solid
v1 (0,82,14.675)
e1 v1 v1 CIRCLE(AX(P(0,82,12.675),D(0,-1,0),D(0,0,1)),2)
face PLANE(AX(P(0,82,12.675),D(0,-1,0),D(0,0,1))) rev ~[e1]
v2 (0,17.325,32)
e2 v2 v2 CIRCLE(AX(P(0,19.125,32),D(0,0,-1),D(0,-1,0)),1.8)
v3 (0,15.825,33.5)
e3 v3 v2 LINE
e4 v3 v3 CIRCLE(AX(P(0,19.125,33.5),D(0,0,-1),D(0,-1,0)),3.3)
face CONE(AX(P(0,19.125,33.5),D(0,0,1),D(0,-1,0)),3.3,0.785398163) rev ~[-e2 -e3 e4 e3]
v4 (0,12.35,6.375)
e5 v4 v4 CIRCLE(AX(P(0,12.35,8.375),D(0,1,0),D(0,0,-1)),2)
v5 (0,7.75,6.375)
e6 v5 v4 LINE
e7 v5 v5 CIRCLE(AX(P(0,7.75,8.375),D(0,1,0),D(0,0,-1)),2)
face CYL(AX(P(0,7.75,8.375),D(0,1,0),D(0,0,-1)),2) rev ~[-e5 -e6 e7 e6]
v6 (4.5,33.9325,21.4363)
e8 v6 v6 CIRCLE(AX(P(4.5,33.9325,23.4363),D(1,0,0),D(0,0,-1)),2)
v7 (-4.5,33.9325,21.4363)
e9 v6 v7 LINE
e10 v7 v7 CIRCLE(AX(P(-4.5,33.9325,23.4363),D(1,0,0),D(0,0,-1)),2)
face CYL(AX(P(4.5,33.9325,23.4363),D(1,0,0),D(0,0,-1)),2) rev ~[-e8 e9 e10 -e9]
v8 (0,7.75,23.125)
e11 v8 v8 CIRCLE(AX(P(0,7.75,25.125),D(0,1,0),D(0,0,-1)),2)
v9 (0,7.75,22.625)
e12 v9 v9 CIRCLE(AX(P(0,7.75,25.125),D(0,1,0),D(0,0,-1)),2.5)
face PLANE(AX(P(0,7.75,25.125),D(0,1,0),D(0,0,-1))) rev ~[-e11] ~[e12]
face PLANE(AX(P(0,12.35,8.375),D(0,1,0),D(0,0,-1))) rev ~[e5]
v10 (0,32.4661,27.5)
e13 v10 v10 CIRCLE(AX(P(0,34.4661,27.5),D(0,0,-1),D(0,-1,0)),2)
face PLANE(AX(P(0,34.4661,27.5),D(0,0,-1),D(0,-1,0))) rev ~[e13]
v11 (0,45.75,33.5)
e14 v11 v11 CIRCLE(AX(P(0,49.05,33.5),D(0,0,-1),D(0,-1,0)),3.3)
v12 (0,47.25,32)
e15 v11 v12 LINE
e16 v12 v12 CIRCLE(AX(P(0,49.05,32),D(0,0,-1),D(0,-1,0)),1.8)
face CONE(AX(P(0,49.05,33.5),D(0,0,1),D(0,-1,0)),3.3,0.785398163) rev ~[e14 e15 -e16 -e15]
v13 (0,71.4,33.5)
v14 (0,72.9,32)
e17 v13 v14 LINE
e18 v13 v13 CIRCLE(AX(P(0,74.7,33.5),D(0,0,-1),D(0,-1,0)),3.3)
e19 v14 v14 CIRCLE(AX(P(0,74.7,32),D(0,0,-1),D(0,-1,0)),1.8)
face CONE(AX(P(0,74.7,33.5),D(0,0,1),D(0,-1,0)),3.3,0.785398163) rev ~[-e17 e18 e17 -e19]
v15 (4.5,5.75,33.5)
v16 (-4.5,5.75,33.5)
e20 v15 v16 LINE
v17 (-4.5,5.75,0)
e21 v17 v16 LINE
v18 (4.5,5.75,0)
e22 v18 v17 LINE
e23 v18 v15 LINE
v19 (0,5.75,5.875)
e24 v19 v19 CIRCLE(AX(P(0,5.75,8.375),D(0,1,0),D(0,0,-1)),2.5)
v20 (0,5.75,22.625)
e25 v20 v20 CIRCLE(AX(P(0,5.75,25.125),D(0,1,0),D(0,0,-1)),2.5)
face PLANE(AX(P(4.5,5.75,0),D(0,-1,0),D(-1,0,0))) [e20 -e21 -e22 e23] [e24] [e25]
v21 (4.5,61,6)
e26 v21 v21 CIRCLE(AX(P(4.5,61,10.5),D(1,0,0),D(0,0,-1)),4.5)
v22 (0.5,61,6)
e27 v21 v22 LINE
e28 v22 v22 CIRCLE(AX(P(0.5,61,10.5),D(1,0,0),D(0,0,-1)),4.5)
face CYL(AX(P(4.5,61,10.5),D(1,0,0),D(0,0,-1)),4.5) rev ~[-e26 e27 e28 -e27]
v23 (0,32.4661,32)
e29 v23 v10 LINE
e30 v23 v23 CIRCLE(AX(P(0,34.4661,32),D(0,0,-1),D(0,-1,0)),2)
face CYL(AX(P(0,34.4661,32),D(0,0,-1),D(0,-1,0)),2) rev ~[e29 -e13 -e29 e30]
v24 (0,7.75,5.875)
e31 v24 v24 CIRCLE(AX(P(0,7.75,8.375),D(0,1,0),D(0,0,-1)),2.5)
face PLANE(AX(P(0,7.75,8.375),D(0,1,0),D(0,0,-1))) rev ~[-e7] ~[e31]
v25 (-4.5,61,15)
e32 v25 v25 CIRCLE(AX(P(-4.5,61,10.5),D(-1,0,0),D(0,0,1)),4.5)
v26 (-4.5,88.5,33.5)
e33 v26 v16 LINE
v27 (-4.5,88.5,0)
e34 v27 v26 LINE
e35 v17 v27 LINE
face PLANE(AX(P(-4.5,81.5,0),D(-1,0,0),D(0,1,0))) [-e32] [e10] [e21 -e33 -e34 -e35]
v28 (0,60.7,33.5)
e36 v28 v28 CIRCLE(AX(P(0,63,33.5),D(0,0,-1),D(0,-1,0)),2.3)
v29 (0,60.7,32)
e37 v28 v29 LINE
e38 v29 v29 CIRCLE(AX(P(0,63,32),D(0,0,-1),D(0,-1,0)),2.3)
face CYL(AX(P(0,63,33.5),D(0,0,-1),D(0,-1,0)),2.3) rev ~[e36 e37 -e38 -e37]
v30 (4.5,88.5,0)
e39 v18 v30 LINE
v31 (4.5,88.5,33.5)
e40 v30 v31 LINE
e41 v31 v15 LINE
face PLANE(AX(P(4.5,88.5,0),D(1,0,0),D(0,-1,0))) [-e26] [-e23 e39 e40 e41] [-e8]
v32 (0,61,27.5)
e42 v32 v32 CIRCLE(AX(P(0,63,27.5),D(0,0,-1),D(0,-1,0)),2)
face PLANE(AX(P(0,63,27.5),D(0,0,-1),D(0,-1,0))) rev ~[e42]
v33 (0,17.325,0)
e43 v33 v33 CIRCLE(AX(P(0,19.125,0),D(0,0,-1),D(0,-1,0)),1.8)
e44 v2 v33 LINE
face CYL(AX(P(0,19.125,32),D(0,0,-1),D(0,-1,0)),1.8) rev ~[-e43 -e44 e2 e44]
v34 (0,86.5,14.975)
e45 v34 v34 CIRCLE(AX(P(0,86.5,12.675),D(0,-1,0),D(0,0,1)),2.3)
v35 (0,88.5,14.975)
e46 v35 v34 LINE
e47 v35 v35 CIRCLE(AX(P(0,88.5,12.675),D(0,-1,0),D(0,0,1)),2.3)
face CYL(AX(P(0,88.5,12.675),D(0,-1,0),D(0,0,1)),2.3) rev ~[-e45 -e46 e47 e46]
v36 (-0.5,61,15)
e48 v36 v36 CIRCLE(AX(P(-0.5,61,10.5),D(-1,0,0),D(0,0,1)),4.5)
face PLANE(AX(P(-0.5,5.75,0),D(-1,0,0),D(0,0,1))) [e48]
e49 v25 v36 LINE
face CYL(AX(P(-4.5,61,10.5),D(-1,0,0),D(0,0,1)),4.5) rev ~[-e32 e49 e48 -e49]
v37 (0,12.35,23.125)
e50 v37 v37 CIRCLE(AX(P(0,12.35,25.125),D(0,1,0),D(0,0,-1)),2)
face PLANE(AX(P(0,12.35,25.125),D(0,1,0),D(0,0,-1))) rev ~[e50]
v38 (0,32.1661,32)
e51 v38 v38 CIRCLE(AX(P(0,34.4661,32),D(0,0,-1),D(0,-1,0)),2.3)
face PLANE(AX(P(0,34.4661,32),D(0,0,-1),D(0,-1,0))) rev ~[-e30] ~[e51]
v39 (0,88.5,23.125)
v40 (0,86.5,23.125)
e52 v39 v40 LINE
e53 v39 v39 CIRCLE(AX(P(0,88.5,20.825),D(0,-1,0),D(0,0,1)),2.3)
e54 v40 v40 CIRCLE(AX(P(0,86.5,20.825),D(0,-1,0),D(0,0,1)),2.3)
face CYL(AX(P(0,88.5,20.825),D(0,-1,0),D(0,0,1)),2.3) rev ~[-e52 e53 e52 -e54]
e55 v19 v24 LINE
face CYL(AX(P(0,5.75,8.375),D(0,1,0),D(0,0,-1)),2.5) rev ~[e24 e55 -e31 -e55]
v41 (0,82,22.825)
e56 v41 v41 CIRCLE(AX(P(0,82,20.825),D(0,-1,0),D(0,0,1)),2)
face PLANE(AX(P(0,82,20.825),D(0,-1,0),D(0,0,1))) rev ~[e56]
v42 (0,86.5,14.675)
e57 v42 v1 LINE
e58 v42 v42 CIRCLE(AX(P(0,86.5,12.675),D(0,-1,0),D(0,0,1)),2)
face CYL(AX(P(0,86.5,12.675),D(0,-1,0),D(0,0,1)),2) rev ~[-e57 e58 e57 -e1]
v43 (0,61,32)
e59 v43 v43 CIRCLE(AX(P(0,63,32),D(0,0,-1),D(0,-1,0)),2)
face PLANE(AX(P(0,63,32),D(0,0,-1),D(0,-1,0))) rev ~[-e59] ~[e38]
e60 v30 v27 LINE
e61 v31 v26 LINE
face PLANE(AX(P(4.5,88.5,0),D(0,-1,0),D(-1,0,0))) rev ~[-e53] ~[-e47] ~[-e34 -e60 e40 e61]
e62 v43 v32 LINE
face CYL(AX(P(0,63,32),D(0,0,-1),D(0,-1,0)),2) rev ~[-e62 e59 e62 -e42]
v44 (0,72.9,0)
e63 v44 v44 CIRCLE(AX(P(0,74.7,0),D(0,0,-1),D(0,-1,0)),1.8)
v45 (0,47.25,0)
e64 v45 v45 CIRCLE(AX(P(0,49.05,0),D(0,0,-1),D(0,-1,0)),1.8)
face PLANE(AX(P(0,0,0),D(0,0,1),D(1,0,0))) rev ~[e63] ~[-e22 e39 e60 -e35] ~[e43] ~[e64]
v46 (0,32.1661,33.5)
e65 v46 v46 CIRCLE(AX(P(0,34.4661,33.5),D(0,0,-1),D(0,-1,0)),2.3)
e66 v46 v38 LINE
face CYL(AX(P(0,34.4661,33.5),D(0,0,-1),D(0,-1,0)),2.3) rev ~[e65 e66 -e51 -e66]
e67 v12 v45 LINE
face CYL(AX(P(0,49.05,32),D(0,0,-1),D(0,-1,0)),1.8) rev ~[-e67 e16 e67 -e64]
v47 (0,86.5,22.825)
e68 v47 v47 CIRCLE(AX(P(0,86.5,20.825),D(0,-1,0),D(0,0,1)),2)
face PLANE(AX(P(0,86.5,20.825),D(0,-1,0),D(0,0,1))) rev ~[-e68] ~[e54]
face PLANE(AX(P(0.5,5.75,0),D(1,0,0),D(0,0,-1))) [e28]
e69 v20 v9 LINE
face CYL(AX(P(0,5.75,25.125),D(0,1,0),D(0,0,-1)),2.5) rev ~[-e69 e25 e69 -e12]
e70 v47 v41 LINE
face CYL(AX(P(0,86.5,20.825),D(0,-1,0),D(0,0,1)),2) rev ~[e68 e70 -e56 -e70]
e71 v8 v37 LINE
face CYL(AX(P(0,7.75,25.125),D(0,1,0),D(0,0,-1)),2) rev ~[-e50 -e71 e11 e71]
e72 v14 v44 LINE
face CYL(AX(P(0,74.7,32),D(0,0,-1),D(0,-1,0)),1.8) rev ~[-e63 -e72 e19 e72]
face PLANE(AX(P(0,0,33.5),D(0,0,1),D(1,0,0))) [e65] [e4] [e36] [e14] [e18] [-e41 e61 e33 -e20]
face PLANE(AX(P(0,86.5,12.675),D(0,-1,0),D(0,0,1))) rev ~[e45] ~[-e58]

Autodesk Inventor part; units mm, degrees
ref_plane "YZ Plane" through (0, 0, 0) normal (1, 0, 0) x (0, 1, 0)
ref_plane "XZ Plane" through (0, 0, 0) normal (0, 1, 0) x (-1, 0, 0)
ref_plane "Work Plane1" through (0, 0, 0) normal (0, 0, 1) x (1, 0, 0)
ref_plane "Work Plane2" through (-89, -40.3889, 33.5) normal (0, 0, 1) x (1, 0, 0)
sketch "Sketch1" plane through (0, 0, 0) normal (0, 0, 1) x (1, 0, 0)
  line L0 (23.5, 88.5) -> (-23.5, 88.5) projected
  line L1 (-23.5, 88.5) -> (-23.5, 36.5) projected
  line L2 (-26.5, 33.5) -> (-89, 33.5) projected
  line L3 (-89, 33.5) -> (-89, -72.5) projected
  line L4 (-89, -72.5) -> (-77, -72.5) projected
  line L5 (-74, -75.5) -> (-74, -93.5) projected
  line L6 (-74, -93.5) -> (74, -93.5) projected
  line L7 (74, -93.5) -> (74, -75.5) projected
  line L8 (77, -72.5) -> (89, -72.5) projected
  line L9 (89, -72.5) -> (89, 33.5) projected
  line L10 (89, 33.5) -> (26.5, 33.5) projected
  line L11 (23.5, 36.5) -> (23.5, 88.5) projected
  line L12 (-4.5, 81.5) -> (-4.5, 36.5) projected
  line L13 (-7.5, 33.5) -> (-13.5, 33.5) projected
  line L14 (-16.5, 36.5) -> (-16.5, 81.5) projected
  line L15 (7.5, 84.5) -> (13.5, 84.5) projected
  line L16 (16.5, 81.5) -> (16.5, 36.5) projected
  line L17 (13.5, 33.5) -> (7.5, 33.5) projected
  line L18 (4.5, 36.5) -> (4.5, 81.5) projected
  line L19 (-13.5, 84.5) -> (-7.5, 84.5) projected
  line L20 (-4.5, 88.5) -> (4.5, 88.5)
  line L21 (4.5, 88.5) -> (4.5, 5.75)
  line L22 (4.5, 5.75) -> (-4.5, 5.75)
  line L23 (-4.5, 5.75) -> (-4.5, 88.5)
  line L24 (-32.2, 4.75) -> (-59.9, 4.75)
  arc A0 (13.5, 33.5) -> (16.5, 36.5) centre (13.5, 36.5) ccw projected
  arc A1 (4.5, 36.5) -> (7.5, 33.5) centre (7.5, 36.5) ccw projected
  arc A2 (7.5, 84.5) -> (4.5, 81.5) centre (7.5, 81.5) ccw projected
  arc A3 (16.5, 81.5) -> (13.5, 84.5) centre (13.5, 81.5) ccw projected
  arc A4 (-4.5, 81.5) -> (-7.5, 84.5) centre (-7.5, 81.5) ccw projected
  arc A5 (-7.5, 33.5) -> (-4.5, 36.5) centre (-7.5, 36.5) ccw projected
  arc A6 (-16.5, 36.5) -> (-13.5, 33.5) centre (-13.5, 36.5) ccw projected
  arc A7 (-13.5, 84.5) -> (-16.5, 81.5) centre (-13.5, 81.5) ccw projected
  arc A8 (-26.5, 33.5) -> (-23.5, 36.5) centre (-26.5, 36.5) ccw projected
  arc A9 (-74, -75.5) -> (-77, -72.5) centre (-77, -75.5) ccw projected
  arc A10 (77, -72.5) -> (74, -75.5) centre (77, -75.5) ccw projected
  arc A11 (23.5, 36.5) -> (26.5, 33.5) centre (26.5, 36.5) ccw projected
  circle A12 centre (21.5, -85.5) radius 1.8 projected
  circle A13 centre (-64.5, -85.5) radius 1.8 projected
  circle A14 centre (83.4, -16.3889) radius 1.8 projected
  circle A15 centre (-83.4, -19.2889) radius 1.8 projected
  circle A16 centre (-21.5, -85.5) radius 1.8 projected
  circle A17 centre (64.5, -85.5) radius 1.8 projected
  circle A18 centre (39.125, 25.9125) radius 1.0065 projected
  circle A19 centre (72.95, 12.275) radius 1.0065 projected
  circle A20 centre (86, 30.5) radius 1.0065 projected
  circle A21 centre (-86, 30.5) radius 1.0065 projected
  circle A22 centre (-39.125, 12.3375) radius 1.0065 projected
  circle A23 centre (-72.95, 25.975) radius 1.0065 projected
  circle A24 centre (-72.95, 12.275) radius 1.0065 projected
  circle A25 centre (-39.125, 25.9125) radius 1.0065 projected
  circle A26 centre (-86, 7.75) radius 1.0065 projected
  circle A27 centre (86, 7.75) radius 1.0065 projected
  circle A28 centre (72.95, 25.975) radius 1.0065 projected
  circle A29 centre (39.125, 12.3375) radius 1.0065 projected
  circle A30 centre (78, -67.1725) radius 1.2295 projected
  circle A31 centre (-24.1, -73.1) radius 1.2295 projected
  circle A32 centre (-42.4984, -44.6666) radius 1.2295 projected
  circle A33 centre (-79, -42.3889) radius 1.2295 projected
  circle A34 centre (-19.5, 28.875) radius 1.2295 projected
  circle A35 centre (19.5, 9.55) radius 1.2295 projected
  circle A36 centre (19.5, 47.3) radius 1.2295 projected
  circle A37 centre (-19.5, 47.3) radius 1.2295 projected
  circle A38 centre (0, 74.7) radius 1.2295 projected
  circle A39 centre (-19.4231, 74.8077) radius 1.2295 projected
  circle A40 centre (19.5, 74.7) radius 1.2295 projected
  circle A41 centre (0, 49.05) radius 1.2295 projected
  circle A42 centre (19.5, 28.875) radius 1.2295 projected
  circle A43 centre (0, 19.125) radius 1.2295 projected
  circle A44 centre (-19.5, 9.55) radius 1.2295 projected
  circle A45 centre (-78, -67.1725) radius 1.2295 projected
  circle A46 centre (24.1, -73.1) radius 1.2295 projected
  circle A47 centre (42.5, -44.6649) radius 1.2295 projected
  circle A48 centre (79, -42.3889) radius 1.2295 projected
  circle A49 centre (24.1, -24.9) radius 1.2295 projected
  circle A50 centre (-24.1, -24.9) radius 1.2295 projected
  point P0 (0, 0)
  point P1 (-4.5, 81.5)
  point P2 (-4.5, 36.5)
  point P3 (7.5, 81.5)
  point P4 (13.5, 81.5)
  point P5 (-7.5, 81.5)
  point P6 (-13.5, 81.5)
  dimension "d41" = 1
extrude "Extrusion1" add sketch "Sketch1" along normal up to surface (33.5 mm away) contours L21 L18 L22 L23 L12 L0 | A38 | A41 | A43
sketch "Sketch2" plane through (4.5, 5.75, 0) normal (1, 0, 0) x (0, 0, -1)
  circle A0 centre (-23.4363, 28.1825) radius 2 projected
  point P0 (0, -5.75)
extrude "Extrusion2" cut sketch "Sketch2" against normal blind 10
sketch "Sketch3" plane through (4.5, 5.75, 0) normal (1, 0, 0) x (0, 0, -1)
  circle A0 centre (-10.5, 55.25) radius 4.5 projected
  point P0 (0, -5.75)
extrude "Extrusion3" cut sketch "Sketch3" against normal blind 4
sketch "Sketch4" plane through (-4.5, 5.75, 0) normal (-1, 0, 0) x (0, 0, 1)
  circle A0 centre (10.5, 55.25) radius 4.5 projected
  point P0 (0, -5.75)
extrude "Extrusion4" cut sketch "Sketch4" against normal blind 4
sketch "Sketch5" plane through (-4.5, 5.75, 33.5) normal (0, 0, 1) x (1, 0, 0)
  line L0 (5, 59.75) -> (5, 50.75) projected
  line L1 (4, 50.75) -> (4, 59.75) projected
  line L2 (9, 26.1825) -> (0, 26.1825) projected
  line L3 (9, 30.1825) -> (0, 30.1825) projected
  line L4 (17, 78.15) -> (-8, 78.15)
  line L5 (-8, 35.85) -> (17, 35.85)
  line L6 (9, 82.75) -> (9, 0) projected
  line L7 (0, 50.75) -> (0, 59.75) projected
  line L8 (9, 35.85) -> (0, 35.85)
  line L9 (0, 35.85) -> (0, 50.75)
  line L10 (0, 50.75) -> (9, 50.75)
  line L11 (9, 50.75) -> (9, 35.85)
  line L12 (0, 0) -> (0, 82.75) projected
  line L13 (9, 78.15) -> (0, 78.15)
  line L14 (0, 78.15) -> (0, 59.75)
  line L15 (0, 59.75) -> (9, 59.75)
  line L16 (9, 59.75) -> (9, 78.15)
  line L17 (-18, 6.625) -> (-18, 20.125) projected
  line L18 (-18, 13.375) -> (27, 13.375)
  line L19 (9, 35.85) -> (0, 50.75)
  line L20 (9, 59.75) -> (9, 50.75) projected
  line L21 (0, 35.85) -> (9, 50.75)
  line L22 (9, 59.75) -> (0, 78.15)
  line L23 (0, 59.75) -> (9, 78.15)
  point P0 (4.5, -5.75)
  point P1 (4.5, 13.375)
  point P2 (4.5, 43.3)
  point P3 (4.5, 68.95)
  dimension "d9" = 4.5
  dimension "d10" = 4.5
hole "Hole1" at (0, 19.125, 33.5) at (0, 49.05, 33.5) at (0, 74.7, 33.5) direction (0, 0, -1) diameter 3.6 end through all countersink diameter 6.6 countersink angle 90 clearance for "Countersunk Flat Head Screw ISO 2009/7046" size "M3" standard "ISO"
sketch "Sketch6" plane through (-4.5, 5.75, 0) normal (0, -1, 0) x (1, 0, 0)
  line L0 (9, 33.5) -> (0, 33.5) projected
  line L1 (0, 0) -> (0, 33.5) projected
  line L2 (0, 0) -> (9, 0) projected
  line L3 (9, 0) -> (9, 33.5) projected
  line L4 (0, 16.75) -> (9, 16.75)
  line L5 (9, 16.75) -> (0, 33.5)
  line L6 (9, 33.5) -> (0, 16.75)
  line L7 (0, 16.75) -> (9, 0)
  line L8 (9, 16.75) -> (0, 0)
  point P0 (4.5, 0)
  point P1 (4.5, 8.375)
  point P2 (4.5, 25.125)
hole "Hole2" at (0, 5.75, 8.375) at (0, 5.75, 25.125) direction (0, 1, 0) diameter 4 depth 6.6 counterbore diameter 5 counterbore depth 2
sketch "Sketch7" plane through (-4.5, 88.5, 0) normal (0, 1, 0) x (1, 0, 0)
  line L0 (0, -33.5) -> (9, -33.5) projected
  line L1 (0, -33.5) -> (9, -33.5) projected
  line L2 (9, 0) -> (9, -33.5) projected
  line L3 (9, 0) -> (0, 0) projected
  line L4 (0, 0) -> (0, -33.5) projected
  line L5 (-8, -1.4) -> (-8, -6.6) projected
  line L6 (-8, -32.1) -> (-8, -26.9) projected
  line L7 (17, -32.1) -> (17, -26.9) projected
  line L8 (17, -1.4) -> (17, -6.6) projected
  line L9 (17, -32.1) -> (-8, -32.1)
  line L10 (-8, -32.1) -> (-8, -26.9)
  line L11 (-8, -26.9) -> (17, -26.9)
  line L12 (17, -26.9) -> (17, -32.1)
  line L13 (-8, -6.6) -> (17, -6.6)
  line L14 (17, -6.6) -> (17, -1.4)
  line L15 (17, -1.4) -> (-8, -1.4)
  line L16 (-8, -1.4) -> (-8, -6.6)
  line L17 (17, -6.6) -> (-8, -6.6)
  line L18 (-8, -6.6) -> (-8, -8.6)
  line L19 (-8, -8.6) -> (17, -8.6)
  line L20 (17, -8.6) -> (17, -6.6)
  line L21 (-8, -26.9) -> (17, -26.9)
  line L22 (17, -26.9) -> (17, -24.9)
  line L23 (17, -24.9) -> (-8, -24.9)
  line L24 (-8, -24.9) -> (-8, -26.9)
  line L25 (9, 0) -> (9, -33.5) projected
  line L26 (9, -16.75) -> (0, -16.75)
  line L27 (0, 0) -> (0, -33.5) projected
  line L28 (9, -24.9) -> (0, -16.75)
  line L29 (9, -8.6) -> (0, -16.75)
  line L30 (0, -8.6) -> (9, -16.75)
  line L31 (9, -16.75) -> (0, -24.9)
  point P0 (4.5, 0)
  point P1 (4.5, -20.825)
  point P2 (4.5, -12.675)
  dimension "d25" = 2
  dimension "d26" = 2
hole "Hole3" at (0, 88.5, 20.825) at (0, 88.5, 12.675) direction (0, -1, 0) diameter 4 depth 6.5 counterbore diameter 4.6 counterbore depth 2
sketch "Sketch8" plane through (-4.5, 5.75, 33.5) normal (0, 0, 1) x (1, 0, 0)
  line L0 (26, 27.2497) -> (-17, 27.2497)
  line L1 (26, 31.2497) -> (-17, 31.2497)
  line L2 (4, 52.75) -> (-1, 52.75)
  line L3 (4, 61.75) -> (-1, 61.75)
  line L4 (10, 61.75) -> (5, 61.75)
  line L5 (9, 50.75) -> (5, 50.75) projected
  line L6 (0, 0) -> (0, 82.75) projected
  line L7 (9, 52.75) -> (0, 52.75)
  line L8 (0, 52.75) -> (0, 61.75)
  line L9 (0, 61.75) -> (9, 61.75)
  line L10 (9, 61.75) -> (9, 50.75)
  line L11 (9, 26.1825) -> (0, 26.1825) projected
  line L12 (0, 31.2497) -> (9, 31.2497)
  line L13 (9, 31.2497) -> (9, 26.1825)
  line L14 (9, 26.1825) -> (0, 26.1825)
  line L15 (0, 26.1825) -> (0, 31.2497)
  line L16 (9, 26.1825) -> (0, 31.2497)
  line L17 (0, 26.1825) -> (9, 31.2497)
  line L18 (10, 51.75) -> (0, 61.75)
  line L19 (0, 52.75) -> (9, 61.75)
  point P0 (4.5, -5.75)
  point P1 (4.5, 28.7161)
  point P2 (4.5, 57.25)
hole "Hole4" at (0, 34.4661, 33.5) at (0, 63, 33.5) direction (0, 0, -1) diameter 4 depth 6 counterbore diameter 4.6 counterbore depth 1.5
equation "\"d9\" = d10"
properties part number "middle_gear_holder" material "Nylon 6/6"
